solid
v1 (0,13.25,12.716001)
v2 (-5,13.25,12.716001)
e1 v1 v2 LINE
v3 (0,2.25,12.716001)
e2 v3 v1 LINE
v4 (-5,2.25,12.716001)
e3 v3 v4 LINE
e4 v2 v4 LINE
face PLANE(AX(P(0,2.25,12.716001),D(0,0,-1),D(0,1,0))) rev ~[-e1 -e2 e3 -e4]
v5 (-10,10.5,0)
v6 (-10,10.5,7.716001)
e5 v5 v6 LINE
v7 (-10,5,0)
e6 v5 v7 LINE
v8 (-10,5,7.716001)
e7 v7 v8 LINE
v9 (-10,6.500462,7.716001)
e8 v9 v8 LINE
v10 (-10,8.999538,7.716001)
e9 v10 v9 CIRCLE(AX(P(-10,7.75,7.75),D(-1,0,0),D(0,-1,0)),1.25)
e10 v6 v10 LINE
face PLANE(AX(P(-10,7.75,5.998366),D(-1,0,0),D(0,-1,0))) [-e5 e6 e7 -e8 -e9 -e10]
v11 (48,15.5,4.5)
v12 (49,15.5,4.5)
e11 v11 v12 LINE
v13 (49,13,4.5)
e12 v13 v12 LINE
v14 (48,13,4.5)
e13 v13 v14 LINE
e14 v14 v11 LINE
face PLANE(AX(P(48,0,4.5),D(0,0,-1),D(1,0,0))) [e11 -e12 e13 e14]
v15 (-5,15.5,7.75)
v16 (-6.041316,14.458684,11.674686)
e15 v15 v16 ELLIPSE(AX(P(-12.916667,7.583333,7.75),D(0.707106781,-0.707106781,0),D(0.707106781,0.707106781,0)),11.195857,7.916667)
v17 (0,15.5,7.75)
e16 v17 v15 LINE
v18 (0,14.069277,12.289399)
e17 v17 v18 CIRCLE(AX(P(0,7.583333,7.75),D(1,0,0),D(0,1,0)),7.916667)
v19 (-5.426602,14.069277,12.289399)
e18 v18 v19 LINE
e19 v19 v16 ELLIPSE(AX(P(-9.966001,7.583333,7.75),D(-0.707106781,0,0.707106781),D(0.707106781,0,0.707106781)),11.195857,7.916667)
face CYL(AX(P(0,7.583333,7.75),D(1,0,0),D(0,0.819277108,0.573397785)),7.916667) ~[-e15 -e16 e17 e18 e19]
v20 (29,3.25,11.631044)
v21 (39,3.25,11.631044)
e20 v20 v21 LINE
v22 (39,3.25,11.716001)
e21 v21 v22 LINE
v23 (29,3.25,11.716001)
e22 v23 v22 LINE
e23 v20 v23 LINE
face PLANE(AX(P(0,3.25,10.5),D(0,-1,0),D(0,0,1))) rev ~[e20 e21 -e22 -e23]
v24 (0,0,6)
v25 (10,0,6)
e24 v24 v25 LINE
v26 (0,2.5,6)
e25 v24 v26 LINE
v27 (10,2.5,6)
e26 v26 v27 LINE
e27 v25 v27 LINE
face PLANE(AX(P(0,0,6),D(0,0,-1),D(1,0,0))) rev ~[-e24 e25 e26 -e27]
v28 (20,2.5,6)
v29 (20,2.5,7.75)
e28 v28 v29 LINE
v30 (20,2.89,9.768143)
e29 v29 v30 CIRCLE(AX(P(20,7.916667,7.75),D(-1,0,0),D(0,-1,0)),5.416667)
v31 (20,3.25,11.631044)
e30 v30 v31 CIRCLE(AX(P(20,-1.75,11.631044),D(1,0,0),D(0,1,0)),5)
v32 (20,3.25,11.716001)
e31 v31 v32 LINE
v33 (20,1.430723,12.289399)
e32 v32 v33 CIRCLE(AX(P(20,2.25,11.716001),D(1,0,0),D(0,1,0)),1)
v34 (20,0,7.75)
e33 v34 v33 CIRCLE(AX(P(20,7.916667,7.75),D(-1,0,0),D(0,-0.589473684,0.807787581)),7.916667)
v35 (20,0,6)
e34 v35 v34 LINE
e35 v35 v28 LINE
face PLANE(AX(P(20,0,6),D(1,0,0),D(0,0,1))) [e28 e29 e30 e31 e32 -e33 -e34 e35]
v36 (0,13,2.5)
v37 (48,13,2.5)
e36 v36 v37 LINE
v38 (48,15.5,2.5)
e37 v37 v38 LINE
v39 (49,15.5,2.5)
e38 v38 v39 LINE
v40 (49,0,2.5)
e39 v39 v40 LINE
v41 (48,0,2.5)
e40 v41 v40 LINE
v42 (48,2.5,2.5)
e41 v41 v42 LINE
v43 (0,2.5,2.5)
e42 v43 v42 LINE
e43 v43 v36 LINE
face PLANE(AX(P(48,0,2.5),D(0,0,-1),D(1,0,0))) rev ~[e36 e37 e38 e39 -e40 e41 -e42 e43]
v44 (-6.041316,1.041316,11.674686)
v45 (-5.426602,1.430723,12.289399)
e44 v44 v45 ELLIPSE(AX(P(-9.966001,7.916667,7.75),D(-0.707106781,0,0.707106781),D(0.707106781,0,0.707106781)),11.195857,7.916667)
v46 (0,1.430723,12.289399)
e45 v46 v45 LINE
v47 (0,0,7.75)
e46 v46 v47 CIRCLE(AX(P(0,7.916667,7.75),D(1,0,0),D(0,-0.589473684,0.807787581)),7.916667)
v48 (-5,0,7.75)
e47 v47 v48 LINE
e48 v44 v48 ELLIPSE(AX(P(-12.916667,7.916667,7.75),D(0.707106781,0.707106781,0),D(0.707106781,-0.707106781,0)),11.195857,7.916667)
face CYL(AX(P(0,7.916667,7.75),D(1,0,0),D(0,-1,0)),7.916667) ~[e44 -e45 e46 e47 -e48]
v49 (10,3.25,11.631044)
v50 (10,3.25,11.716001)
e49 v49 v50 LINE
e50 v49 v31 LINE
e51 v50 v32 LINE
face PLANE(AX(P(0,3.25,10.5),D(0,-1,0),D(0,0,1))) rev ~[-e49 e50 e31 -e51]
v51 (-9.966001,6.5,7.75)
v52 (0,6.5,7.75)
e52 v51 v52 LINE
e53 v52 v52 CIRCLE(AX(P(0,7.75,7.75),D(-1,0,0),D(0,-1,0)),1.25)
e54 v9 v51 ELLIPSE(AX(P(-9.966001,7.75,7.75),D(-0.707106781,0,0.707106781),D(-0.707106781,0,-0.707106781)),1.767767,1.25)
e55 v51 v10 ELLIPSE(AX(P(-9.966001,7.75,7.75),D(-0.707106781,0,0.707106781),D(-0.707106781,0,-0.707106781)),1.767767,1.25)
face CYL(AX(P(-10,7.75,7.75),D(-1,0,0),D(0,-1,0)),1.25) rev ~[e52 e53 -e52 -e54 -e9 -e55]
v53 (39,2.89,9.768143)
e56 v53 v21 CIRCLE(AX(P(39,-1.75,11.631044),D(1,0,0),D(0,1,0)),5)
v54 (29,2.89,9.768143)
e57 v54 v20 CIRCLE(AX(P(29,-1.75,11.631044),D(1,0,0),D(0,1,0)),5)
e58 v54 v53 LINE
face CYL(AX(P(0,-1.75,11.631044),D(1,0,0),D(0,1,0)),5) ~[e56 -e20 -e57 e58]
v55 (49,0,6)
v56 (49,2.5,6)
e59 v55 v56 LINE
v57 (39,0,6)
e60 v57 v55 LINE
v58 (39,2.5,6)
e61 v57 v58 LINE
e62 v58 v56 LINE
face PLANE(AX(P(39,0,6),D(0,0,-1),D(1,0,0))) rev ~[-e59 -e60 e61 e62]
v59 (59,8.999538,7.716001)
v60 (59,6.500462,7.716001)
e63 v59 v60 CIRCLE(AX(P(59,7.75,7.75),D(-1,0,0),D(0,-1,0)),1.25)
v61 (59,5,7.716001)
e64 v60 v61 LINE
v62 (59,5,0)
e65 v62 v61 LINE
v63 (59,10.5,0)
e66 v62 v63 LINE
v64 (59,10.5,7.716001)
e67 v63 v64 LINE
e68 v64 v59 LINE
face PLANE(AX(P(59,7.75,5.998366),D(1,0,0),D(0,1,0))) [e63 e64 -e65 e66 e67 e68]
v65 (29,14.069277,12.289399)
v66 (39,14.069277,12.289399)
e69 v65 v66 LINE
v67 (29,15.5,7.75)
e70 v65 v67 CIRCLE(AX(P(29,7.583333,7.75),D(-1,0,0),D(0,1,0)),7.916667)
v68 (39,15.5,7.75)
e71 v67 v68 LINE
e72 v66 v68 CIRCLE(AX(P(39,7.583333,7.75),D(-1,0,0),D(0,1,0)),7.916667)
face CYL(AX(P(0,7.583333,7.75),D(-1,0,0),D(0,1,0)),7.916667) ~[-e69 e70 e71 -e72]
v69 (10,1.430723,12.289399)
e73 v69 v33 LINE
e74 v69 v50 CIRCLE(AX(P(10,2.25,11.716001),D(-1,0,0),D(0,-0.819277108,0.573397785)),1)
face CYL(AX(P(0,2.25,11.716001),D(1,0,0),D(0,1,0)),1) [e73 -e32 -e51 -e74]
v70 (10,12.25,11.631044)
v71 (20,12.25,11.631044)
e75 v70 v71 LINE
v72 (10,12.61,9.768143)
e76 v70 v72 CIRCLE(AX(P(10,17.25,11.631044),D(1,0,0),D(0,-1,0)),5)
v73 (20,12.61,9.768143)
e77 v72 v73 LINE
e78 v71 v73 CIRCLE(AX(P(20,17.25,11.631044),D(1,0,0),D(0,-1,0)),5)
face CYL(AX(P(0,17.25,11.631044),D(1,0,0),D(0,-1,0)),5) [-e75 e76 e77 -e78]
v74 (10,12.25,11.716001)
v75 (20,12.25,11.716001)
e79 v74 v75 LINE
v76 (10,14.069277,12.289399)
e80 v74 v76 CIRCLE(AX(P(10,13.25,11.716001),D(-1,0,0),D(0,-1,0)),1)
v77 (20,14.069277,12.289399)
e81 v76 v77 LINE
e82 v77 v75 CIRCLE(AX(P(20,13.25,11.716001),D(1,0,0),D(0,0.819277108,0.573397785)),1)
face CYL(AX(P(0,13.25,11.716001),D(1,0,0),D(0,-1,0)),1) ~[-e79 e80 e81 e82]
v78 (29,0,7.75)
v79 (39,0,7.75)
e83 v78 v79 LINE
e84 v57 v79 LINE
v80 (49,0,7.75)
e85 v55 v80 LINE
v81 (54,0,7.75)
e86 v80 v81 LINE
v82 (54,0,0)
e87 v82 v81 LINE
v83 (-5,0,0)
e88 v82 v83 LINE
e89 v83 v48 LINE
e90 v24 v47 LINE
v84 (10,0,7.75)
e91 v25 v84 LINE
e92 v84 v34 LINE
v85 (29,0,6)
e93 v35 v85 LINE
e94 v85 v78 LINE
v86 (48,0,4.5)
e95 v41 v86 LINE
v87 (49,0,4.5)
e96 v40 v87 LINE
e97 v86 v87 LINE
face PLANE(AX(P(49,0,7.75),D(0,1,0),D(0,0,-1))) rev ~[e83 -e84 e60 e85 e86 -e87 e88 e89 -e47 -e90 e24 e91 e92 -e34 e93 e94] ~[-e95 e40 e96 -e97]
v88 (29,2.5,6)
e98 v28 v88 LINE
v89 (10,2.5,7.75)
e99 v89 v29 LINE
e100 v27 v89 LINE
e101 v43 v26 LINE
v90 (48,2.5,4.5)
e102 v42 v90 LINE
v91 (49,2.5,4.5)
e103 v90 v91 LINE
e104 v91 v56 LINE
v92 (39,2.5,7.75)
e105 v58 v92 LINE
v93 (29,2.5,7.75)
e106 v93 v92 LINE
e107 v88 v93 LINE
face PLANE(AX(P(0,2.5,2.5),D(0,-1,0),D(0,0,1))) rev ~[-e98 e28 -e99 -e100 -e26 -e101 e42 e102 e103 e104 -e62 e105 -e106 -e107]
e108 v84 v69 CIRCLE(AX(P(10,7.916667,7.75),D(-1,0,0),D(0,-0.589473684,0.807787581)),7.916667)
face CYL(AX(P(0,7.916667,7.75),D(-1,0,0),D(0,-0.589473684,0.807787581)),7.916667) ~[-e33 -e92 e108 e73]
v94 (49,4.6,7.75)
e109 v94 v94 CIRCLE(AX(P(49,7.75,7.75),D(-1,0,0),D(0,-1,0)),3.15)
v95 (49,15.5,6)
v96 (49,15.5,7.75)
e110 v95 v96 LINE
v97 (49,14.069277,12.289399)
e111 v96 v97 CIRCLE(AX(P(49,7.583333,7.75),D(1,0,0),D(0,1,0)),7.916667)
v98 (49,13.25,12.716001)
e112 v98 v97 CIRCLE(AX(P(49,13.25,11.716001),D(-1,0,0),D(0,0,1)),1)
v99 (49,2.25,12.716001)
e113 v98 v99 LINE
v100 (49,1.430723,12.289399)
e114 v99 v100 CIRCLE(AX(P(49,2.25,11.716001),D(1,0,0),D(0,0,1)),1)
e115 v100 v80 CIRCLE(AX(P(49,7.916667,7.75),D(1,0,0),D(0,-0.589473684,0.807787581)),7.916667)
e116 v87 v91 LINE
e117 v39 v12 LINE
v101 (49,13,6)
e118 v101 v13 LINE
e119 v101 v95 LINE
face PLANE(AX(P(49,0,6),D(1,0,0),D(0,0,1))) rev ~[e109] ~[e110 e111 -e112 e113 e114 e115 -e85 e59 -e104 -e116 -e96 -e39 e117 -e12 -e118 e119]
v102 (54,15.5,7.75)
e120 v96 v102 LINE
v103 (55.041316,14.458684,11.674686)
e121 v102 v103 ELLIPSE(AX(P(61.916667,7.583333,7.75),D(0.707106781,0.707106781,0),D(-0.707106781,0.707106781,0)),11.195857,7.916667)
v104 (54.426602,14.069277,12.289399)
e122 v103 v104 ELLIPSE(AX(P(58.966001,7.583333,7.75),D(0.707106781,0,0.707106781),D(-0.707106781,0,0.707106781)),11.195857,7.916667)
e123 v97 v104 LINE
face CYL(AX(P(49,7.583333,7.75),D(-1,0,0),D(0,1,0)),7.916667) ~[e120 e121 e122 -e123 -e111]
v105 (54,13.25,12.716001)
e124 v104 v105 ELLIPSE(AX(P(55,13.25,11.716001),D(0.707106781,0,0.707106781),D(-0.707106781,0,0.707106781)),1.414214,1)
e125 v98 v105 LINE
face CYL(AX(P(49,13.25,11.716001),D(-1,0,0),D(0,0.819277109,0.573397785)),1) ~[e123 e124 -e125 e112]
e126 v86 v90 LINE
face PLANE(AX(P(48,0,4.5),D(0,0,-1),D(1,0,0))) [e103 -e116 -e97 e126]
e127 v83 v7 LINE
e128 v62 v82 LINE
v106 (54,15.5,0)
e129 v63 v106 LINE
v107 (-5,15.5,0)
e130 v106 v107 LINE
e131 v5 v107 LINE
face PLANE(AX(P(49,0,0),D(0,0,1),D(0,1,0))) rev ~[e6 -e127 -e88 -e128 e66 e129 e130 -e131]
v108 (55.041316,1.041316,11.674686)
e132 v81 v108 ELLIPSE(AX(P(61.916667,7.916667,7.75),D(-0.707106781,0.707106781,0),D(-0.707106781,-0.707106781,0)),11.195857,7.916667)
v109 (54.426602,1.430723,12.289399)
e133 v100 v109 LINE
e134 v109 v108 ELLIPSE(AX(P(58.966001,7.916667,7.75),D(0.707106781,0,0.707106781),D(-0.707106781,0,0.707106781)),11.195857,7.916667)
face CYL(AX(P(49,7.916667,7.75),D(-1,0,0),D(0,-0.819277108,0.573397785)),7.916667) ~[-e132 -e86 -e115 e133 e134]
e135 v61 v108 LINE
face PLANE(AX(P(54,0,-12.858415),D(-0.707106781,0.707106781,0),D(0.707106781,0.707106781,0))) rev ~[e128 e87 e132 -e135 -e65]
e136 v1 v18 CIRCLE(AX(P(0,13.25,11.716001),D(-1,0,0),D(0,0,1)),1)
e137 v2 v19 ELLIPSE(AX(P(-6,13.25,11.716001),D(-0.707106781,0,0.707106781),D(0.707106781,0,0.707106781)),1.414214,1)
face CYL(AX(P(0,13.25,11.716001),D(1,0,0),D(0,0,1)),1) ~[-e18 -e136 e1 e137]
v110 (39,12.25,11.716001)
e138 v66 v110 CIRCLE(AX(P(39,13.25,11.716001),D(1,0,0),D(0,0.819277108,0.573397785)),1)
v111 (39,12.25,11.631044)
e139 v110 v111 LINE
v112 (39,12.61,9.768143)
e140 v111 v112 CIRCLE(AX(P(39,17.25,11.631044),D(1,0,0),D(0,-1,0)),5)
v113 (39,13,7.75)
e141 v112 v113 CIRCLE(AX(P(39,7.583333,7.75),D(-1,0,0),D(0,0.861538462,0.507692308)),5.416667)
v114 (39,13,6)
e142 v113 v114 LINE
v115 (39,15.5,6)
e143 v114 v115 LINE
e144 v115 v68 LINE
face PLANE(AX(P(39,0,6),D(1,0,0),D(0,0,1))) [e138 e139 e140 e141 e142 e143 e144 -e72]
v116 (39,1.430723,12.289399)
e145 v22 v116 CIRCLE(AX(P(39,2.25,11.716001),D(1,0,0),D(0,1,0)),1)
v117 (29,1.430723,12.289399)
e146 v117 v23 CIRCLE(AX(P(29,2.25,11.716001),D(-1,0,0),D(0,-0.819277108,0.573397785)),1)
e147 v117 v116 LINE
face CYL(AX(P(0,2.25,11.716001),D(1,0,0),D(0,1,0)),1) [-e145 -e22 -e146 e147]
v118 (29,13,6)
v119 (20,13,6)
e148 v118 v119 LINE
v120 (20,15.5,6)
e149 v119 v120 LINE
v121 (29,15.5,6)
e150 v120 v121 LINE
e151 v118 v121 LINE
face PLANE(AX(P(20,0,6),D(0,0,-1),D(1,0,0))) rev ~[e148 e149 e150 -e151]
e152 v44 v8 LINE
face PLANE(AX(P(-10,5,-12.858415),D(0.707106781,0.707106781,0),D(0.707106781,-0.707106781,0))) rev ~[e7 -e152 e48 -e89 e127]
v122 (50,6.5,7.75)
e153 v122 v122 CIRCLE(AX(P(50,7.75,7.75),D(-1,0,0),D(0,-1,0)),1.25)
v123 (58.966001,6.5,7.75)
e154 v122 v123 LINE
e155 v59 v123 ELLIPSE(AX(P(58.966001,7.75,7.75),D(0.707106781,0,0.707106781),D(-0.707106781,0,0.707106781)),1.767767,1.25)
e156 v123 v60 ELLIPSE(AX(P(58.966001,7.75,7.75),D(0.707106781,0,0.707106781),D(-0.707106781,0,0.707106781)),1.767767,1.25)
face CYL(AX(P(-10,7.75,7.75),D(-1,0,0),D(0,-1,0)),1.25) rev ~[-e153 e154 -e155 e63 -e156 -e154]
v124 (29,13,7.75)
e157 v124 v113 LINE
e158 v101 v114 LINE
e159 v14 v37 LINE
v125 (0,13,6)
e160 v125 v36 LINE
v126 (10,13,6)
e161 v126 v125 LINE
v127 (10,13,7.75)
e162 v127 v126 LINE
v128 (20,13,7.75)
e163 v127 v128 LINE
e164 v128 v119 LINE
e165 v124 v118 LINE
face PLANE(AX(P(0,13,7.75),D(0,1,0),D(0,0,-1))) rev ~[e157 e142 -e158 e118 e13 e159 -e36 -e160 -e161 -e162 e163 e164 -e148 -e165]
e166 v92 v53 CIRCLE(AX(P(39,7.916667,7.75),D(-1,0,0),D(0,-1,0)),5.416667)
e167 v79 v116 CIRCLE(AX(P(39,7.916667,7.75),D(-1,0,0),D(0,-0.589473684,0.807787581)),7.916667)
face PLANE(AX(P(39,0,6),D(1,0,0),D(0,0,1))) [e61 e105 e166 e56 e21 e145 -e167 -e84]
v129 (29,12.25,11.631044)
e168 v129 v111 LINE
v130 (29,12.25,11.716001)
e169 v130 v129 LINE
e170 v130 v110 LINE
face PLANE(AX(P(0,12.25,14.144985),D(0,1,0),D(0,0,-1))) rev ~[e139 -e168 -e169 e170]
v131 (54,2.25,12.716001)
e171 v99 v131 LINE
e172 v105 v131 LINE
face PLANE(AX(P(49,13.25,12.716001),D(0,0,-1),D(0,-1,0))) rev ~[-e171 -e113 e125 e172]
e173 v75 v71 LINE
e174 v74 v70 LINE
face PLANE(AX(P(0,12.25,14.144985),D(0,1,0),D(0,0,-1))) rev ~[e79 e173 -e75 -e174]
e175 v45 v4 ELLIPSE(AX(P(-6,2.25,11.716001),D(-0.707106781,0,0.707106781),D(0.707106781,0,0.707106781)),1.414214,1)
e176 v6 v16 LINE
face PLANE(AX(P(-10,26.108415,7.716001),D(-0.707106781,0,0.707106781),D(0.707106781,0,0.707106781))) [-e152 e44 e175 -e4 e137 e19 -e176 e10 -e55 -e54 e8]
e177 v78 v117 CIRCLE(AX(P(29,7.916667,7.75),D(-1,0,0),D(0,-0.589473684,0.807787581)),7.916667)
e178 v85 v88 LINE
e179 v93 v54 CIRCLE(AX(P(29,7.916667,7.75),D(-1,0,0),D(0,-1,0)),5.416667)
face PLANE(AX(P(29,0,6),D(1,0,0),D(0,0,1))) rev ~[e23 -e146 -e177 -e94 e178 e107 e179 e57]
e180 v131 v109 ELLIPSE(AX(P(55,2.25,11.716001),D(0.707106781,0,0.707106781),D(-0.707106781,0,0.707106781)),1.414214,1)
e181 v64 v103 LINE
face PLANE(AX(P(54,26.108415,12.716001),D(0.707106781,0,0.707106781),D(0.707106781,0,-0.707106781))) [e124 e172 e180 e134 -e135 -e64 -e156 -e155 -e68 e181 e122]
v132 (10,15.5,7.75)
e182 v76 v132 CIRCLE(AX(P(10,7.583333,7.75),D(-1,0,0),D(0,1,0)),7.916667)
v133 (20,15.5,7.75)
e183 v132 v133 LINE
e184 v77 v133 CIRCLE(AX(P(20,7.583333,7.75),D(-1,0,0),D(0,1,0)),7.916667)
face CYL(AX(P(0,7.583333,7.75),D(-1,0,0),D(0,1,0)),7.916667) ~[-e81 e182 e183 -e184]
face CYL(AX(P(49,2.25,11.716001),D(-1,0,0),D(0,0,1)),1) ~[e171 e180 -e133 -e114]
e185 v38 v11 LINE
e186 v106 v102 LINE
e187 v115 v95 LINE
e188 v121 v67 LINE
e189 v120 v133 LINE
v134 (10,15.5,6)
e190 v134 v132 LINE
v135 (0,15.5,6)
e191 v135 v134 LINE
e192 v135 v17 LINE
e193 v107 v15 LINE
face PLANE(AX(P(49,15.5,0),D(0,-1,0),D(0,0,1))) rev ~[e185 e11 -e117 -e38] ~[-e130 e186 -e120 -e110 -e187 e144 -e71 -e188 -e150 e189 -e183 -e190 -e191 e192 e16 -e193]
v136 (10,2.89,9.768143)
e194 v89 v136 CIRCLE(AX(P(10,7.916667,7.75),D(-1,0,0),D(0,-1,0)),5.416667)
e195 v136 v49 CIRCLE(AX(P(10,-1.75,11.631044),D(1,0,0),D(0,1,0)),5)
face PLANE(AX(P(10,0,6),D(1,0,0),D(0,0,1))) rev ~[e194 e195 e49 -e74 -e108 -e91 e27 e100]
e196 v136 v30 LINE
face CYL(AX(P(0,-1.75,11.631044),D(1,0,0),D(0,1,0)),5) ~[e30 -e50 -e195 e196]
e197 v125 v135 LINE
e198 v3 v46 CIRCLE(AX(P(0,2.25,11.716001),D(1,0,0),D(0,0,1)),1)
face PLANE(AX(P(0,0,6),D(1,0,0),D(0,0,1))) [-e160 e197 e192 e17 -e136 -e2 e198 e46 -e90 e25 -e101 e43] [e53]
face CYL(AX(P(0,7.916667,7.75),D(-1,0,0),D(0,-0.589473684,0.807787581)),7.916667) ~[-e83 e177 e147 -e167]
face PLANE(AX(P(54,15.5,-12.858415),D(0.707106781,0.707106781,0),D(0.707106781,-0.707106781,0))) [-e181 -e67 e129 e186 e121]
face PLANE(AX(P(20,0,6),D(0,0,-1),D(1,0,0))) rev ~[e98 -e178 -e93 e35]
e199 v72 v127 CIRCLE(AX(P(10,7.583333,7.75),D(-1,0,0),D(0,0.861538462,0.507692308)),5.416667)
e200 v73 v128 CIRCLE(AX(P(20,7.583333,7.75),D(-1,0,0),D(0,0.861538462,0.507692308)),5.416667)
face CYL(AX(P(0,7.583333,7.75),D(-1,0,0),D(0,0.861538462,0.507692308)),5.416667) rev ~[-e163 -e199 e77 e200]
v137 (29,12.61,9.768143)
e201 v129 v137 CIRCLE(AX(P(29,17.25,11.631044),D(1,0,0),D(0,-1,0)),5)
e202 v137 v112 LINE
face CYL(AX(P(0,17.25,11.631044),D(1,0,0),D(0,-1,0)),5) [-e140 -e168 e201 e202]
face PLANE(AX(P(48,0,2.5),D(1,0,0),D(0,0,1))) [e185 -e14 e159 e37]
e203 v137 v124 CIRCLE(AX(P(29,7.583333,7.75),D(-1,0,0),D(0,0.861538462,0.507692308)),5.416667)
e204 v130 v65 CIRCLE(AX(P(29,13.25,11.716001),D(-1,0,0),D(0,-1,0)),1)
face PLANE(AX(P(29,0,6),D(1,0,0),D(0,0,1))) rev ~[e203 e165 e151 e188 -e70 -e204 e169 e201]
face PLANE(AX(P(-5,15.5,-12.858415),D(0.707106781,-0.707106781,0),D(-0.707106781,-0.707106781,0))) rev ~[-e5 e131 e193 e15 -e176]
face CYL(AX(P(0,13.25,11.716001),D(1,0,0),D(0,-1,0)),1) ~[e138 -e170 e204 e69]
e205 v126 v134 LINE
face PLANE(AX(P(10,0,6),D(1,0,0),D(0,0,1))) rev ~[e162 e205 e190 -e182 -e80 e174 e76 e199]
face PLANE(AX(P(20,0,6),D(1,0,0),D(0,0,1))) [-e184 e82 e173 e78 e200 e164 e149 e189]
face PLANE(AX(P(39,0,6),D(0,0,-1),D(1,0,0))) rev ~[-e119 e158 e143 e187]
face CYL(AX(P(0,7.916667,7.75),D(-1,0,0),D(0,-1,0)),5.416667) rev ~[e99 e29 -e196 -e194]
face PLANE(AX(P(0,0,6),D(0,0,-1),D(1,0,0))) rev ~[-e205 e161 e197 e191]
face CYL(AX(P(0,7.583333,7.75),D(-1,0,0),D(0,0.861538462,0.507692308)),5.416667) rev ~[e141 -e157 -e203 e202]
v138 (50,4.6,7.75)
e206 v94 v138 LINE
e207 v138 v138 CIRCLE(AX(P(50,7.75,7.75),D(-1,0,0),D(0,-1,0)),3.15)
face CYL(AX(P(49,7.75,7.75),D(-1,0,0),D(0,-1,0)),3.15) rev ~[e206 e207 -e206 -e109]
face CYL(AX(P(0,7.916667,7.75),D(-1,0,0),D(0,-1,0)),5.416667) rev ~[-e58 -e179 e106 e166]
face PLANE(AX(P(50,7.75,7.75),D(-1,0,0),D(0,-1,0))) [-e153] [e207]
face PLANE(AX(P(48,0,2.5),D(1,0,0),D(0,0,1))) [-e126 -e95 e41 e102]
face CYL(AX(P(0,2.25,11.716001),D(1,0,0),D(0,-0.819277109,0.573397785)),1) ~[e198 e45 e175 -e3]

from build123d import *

# Parameters (mm, degrees)
F0_W         = 49
F0_H         = 15.5
F1_DEPTH     = 2.5
F3_DEPTH     = 49
F4_R         = 1
F5_R         = 5
F7_DEPTH     = 10
F9_DEPTH     = 10
F10_W        = 10
F10_H        = 6.7160013448
F10_W_2      = 9
F11_DEPTH    = 15.501
F12_T1_DEPTH = 36.7168298797
F12_T3_DEPTH = 33.4668298797
F13_R        = 1.25
F14_DEPTH    = 69.001
F15_W        = 1
F15_H        = 2
F16_DEPTH    = 15.501
F17_R        = 3.15
F18_DEPTH    = 1


# Not quite as in the source:
# - a fillet or chamfer that OpenCascade refuses, or shapes differently, is made with other operations: its cross-section is extruded or revolved along the edge and cut away or added


with BuildPart() as f1:
    # F0 (on Top) → F1 (new body)
    with BuildSketch(Plane.XY):
        with Locations((24.5, 7.75)):
            Rectangle(F0_W, F0_H)
    extrude(amount=F1_DEPTH)

    # F2 (on Right) → F3 (join, through all)
    with BuildSketch(Plane.YZ):
        with BuildLine():
            Line((0, 7.75), (0, 2.5))
            Line((0, 2.5), (2.5, 2.5))
            Line((2.5, 2.5), (2.5, 7.75))
            ThreePointArc((2.5, 7.75), (2.690862635, 9.1752192814), (3.25, 10.5))
            Line((3.25, 10.5), (3.25, 14.1449850143))
            ThreePointArc((3.25, 14.1449850143), (0.859115549, 11.3367232028), (0, 7.75))
        make_face()
        with BuildLine():
            Line((13, 7.75), (13, 2.5))
            Line((13, 2.5), (15.5, 2.5))
            Line((15.5, 2.5), (15.5, 7.75))
            ThreePointArc((15.5, 7.75), (14.640884451, 11.3367232028), (12.25, 14.1449850143))
            Line((12.25, 14.1449850143), (12.25, 10.5))
            ThreePointArc((12.25, 10.5), (12.809137365, 9.1752192814), (13, 7.75))
        make_face()
    extrude(amount=F3_DEPTH)

    # F4
    f4_edges = [f1.edges().sort_by_distance(p)[0] for p in [
        (24.5, 12.25, 14.144985),
        (24.5, 3.25, 14.144985),
    ]]
    fillet(f4_edges, radius=F4_R)

    # F5
    f5_edges = [f1.edges().sort_by_distance(p)[0] for p in [
        (24.5, 12.25, 10.5),
        (24.5, 3.25, 10.5),
    ]]
    fillet(f5_edges, radius=F5_R)

    # F6 (on face) → F7 (join)
    with BuildSketch(Plane(origin=(0, 0, 0), x_dir=(0, -1, 0), z_dir=(-1, 0, 0))):
        with BuildLine():
            ThreePointArc((-14.0692771084, 12.2893991295), (-15.1338520571, 10.1297642977), (-15.5, 7.75))
            Line((-15.5, 7.75), (-15.5, 0))
            Line((-15.5, 0), (0, 0))
            Line((0, 0), (0, 7.75))
            ThreePointArc((0, 7.75), (-0.3661479429, 10.1297642977), (-1.4307228916, 12.2893991295))
            ThreePointArc((-1.4307228916, 12.2893991295), (-1.7881546713, 12.6029618244), (-2.25, 12.7160013448))
            Line((-2.25, 12.7160013448), (-13.25, 12.7160013448))
            ThreePointArc((-13.25, 12.7160013448), (-13.7118453287, 12.6029618244), (-14.0692771084, 12.2893991295))
        make_face()
    extrude(amount=F7_DEPTH)

    # F8 (on face) → F9 (join)
    with BuildSketch(Plane.YZ.offset(49)):
        with BuildLine():
            Line((15.5, 0), (15.5, 7.75))
            ThreePointArc((15.5, 7.75), (15.1338520571, 10.1297642977), (14.0692771084, 12.2893991295))
            ThreePointArc((14.0692771084, 12.2893991295), (13.7118453287, 12.6029618244), (13.25, 12.7160013448))
            Line((13.25, 12.7160013448), (2.25, 12.7160013448))
            ThreePointArc((2.25, 12.7160013448), (1.7881546713, 12.6029618244), (1.4307228916, 12.2893991295))
            ThreePointArc((1.4307228916, 12.2893991295), (0.3661479429, 10.1297642977), (0, 7.75))
            Line((0, 7.75), (0, 0))
            Line((0, 0), (15.5, 0))
        make_face()
    extrude(amount=F9_DEPTH)

    # F10 (on face) → F11 (cut, through all)
    with BuildSketch(Plane.XZ):
        with Locations((44, 9.3580006724)):
            Rectangle(F10_W, F10_H)
        with Locations((24.5, 9.3580006724)):
            Rectangle(F10_W_2, F10_H)
        with Locations((5, 9.3580006724)):
            Rectangle(F10_W, F10_H)
    extrude(amount=-F11_DEPTH, mode=Mode.SUBTRACT)

    # F12: chamfer of 5 on 6 edges, made by hand

    # F12_s2 → F12_t1 (cut)
    with BuildSketch(Plane.XZ.offset(-26.1084149398)):
        Polygon((-10, 7.7160013448), (-5, 12.7160013448), (-10, 12.7160013448), align=None)
        Polygon((54, 12.7160013448), (59, 7.7160013448), (59, 12.7160013448), align=None)
    extrude(amount=F12_T1_DEPTH, mode=Mode.SUBTRACT)

    # F12_s4 → F12_t3 (cut)
    with BuildSketch(Plane.XY.offset(-12.8584149398)):
        Polygon((-10, 5), (-5, 0), (-10, 0), align=None)
        Polygon((-5, 15.5), (-10, 10.5), (-10, 15.5), align=None)
        Polygon((54, 0), (59, 5), (59, 0), align=None)
        Polygon((54, 15.5), (59, 10.5), (59, 15.5), align=None)
    extrude(amount=F12_T3_DEPTH, mode=Mode.SUBTRACT)

    # F13 (on face) → F14 (cut, through all)
    with BuildSketch(Plane(origin=(-10, 0, 0), x_dir=(0, -1, 0), z_dir=(-1, 0, 0))):
        with Locations((-7.75, 7.75)):
            Circle(F13_R)
    extrude(amount=-F14_DEPTH, mode=Mode.SUBTRACT)

    # F15 (on face) → F16 (cut, through all)
    with BuildSketch(Plane.XZ):
        with Locations((48.5, 3.5)):
            Rectangle(F15_W, F15_H)
    extrude(amount=-F16_DEPTH, mode=Mode.SUBTRACT)

    # F17 (on face) → F18 (cut)
    with BuildSketch(Plane(origin=(49, 0, 0), x_dir=(0, -1, 0), z_dir=(-1, 0, 0))):
        with Locations((-7.75, 7.75)):
            Circle(F17_R)
    extrude(amount=-F18_DEPTH, mode=Mode.SUBTRACT)


solid = f1.part
